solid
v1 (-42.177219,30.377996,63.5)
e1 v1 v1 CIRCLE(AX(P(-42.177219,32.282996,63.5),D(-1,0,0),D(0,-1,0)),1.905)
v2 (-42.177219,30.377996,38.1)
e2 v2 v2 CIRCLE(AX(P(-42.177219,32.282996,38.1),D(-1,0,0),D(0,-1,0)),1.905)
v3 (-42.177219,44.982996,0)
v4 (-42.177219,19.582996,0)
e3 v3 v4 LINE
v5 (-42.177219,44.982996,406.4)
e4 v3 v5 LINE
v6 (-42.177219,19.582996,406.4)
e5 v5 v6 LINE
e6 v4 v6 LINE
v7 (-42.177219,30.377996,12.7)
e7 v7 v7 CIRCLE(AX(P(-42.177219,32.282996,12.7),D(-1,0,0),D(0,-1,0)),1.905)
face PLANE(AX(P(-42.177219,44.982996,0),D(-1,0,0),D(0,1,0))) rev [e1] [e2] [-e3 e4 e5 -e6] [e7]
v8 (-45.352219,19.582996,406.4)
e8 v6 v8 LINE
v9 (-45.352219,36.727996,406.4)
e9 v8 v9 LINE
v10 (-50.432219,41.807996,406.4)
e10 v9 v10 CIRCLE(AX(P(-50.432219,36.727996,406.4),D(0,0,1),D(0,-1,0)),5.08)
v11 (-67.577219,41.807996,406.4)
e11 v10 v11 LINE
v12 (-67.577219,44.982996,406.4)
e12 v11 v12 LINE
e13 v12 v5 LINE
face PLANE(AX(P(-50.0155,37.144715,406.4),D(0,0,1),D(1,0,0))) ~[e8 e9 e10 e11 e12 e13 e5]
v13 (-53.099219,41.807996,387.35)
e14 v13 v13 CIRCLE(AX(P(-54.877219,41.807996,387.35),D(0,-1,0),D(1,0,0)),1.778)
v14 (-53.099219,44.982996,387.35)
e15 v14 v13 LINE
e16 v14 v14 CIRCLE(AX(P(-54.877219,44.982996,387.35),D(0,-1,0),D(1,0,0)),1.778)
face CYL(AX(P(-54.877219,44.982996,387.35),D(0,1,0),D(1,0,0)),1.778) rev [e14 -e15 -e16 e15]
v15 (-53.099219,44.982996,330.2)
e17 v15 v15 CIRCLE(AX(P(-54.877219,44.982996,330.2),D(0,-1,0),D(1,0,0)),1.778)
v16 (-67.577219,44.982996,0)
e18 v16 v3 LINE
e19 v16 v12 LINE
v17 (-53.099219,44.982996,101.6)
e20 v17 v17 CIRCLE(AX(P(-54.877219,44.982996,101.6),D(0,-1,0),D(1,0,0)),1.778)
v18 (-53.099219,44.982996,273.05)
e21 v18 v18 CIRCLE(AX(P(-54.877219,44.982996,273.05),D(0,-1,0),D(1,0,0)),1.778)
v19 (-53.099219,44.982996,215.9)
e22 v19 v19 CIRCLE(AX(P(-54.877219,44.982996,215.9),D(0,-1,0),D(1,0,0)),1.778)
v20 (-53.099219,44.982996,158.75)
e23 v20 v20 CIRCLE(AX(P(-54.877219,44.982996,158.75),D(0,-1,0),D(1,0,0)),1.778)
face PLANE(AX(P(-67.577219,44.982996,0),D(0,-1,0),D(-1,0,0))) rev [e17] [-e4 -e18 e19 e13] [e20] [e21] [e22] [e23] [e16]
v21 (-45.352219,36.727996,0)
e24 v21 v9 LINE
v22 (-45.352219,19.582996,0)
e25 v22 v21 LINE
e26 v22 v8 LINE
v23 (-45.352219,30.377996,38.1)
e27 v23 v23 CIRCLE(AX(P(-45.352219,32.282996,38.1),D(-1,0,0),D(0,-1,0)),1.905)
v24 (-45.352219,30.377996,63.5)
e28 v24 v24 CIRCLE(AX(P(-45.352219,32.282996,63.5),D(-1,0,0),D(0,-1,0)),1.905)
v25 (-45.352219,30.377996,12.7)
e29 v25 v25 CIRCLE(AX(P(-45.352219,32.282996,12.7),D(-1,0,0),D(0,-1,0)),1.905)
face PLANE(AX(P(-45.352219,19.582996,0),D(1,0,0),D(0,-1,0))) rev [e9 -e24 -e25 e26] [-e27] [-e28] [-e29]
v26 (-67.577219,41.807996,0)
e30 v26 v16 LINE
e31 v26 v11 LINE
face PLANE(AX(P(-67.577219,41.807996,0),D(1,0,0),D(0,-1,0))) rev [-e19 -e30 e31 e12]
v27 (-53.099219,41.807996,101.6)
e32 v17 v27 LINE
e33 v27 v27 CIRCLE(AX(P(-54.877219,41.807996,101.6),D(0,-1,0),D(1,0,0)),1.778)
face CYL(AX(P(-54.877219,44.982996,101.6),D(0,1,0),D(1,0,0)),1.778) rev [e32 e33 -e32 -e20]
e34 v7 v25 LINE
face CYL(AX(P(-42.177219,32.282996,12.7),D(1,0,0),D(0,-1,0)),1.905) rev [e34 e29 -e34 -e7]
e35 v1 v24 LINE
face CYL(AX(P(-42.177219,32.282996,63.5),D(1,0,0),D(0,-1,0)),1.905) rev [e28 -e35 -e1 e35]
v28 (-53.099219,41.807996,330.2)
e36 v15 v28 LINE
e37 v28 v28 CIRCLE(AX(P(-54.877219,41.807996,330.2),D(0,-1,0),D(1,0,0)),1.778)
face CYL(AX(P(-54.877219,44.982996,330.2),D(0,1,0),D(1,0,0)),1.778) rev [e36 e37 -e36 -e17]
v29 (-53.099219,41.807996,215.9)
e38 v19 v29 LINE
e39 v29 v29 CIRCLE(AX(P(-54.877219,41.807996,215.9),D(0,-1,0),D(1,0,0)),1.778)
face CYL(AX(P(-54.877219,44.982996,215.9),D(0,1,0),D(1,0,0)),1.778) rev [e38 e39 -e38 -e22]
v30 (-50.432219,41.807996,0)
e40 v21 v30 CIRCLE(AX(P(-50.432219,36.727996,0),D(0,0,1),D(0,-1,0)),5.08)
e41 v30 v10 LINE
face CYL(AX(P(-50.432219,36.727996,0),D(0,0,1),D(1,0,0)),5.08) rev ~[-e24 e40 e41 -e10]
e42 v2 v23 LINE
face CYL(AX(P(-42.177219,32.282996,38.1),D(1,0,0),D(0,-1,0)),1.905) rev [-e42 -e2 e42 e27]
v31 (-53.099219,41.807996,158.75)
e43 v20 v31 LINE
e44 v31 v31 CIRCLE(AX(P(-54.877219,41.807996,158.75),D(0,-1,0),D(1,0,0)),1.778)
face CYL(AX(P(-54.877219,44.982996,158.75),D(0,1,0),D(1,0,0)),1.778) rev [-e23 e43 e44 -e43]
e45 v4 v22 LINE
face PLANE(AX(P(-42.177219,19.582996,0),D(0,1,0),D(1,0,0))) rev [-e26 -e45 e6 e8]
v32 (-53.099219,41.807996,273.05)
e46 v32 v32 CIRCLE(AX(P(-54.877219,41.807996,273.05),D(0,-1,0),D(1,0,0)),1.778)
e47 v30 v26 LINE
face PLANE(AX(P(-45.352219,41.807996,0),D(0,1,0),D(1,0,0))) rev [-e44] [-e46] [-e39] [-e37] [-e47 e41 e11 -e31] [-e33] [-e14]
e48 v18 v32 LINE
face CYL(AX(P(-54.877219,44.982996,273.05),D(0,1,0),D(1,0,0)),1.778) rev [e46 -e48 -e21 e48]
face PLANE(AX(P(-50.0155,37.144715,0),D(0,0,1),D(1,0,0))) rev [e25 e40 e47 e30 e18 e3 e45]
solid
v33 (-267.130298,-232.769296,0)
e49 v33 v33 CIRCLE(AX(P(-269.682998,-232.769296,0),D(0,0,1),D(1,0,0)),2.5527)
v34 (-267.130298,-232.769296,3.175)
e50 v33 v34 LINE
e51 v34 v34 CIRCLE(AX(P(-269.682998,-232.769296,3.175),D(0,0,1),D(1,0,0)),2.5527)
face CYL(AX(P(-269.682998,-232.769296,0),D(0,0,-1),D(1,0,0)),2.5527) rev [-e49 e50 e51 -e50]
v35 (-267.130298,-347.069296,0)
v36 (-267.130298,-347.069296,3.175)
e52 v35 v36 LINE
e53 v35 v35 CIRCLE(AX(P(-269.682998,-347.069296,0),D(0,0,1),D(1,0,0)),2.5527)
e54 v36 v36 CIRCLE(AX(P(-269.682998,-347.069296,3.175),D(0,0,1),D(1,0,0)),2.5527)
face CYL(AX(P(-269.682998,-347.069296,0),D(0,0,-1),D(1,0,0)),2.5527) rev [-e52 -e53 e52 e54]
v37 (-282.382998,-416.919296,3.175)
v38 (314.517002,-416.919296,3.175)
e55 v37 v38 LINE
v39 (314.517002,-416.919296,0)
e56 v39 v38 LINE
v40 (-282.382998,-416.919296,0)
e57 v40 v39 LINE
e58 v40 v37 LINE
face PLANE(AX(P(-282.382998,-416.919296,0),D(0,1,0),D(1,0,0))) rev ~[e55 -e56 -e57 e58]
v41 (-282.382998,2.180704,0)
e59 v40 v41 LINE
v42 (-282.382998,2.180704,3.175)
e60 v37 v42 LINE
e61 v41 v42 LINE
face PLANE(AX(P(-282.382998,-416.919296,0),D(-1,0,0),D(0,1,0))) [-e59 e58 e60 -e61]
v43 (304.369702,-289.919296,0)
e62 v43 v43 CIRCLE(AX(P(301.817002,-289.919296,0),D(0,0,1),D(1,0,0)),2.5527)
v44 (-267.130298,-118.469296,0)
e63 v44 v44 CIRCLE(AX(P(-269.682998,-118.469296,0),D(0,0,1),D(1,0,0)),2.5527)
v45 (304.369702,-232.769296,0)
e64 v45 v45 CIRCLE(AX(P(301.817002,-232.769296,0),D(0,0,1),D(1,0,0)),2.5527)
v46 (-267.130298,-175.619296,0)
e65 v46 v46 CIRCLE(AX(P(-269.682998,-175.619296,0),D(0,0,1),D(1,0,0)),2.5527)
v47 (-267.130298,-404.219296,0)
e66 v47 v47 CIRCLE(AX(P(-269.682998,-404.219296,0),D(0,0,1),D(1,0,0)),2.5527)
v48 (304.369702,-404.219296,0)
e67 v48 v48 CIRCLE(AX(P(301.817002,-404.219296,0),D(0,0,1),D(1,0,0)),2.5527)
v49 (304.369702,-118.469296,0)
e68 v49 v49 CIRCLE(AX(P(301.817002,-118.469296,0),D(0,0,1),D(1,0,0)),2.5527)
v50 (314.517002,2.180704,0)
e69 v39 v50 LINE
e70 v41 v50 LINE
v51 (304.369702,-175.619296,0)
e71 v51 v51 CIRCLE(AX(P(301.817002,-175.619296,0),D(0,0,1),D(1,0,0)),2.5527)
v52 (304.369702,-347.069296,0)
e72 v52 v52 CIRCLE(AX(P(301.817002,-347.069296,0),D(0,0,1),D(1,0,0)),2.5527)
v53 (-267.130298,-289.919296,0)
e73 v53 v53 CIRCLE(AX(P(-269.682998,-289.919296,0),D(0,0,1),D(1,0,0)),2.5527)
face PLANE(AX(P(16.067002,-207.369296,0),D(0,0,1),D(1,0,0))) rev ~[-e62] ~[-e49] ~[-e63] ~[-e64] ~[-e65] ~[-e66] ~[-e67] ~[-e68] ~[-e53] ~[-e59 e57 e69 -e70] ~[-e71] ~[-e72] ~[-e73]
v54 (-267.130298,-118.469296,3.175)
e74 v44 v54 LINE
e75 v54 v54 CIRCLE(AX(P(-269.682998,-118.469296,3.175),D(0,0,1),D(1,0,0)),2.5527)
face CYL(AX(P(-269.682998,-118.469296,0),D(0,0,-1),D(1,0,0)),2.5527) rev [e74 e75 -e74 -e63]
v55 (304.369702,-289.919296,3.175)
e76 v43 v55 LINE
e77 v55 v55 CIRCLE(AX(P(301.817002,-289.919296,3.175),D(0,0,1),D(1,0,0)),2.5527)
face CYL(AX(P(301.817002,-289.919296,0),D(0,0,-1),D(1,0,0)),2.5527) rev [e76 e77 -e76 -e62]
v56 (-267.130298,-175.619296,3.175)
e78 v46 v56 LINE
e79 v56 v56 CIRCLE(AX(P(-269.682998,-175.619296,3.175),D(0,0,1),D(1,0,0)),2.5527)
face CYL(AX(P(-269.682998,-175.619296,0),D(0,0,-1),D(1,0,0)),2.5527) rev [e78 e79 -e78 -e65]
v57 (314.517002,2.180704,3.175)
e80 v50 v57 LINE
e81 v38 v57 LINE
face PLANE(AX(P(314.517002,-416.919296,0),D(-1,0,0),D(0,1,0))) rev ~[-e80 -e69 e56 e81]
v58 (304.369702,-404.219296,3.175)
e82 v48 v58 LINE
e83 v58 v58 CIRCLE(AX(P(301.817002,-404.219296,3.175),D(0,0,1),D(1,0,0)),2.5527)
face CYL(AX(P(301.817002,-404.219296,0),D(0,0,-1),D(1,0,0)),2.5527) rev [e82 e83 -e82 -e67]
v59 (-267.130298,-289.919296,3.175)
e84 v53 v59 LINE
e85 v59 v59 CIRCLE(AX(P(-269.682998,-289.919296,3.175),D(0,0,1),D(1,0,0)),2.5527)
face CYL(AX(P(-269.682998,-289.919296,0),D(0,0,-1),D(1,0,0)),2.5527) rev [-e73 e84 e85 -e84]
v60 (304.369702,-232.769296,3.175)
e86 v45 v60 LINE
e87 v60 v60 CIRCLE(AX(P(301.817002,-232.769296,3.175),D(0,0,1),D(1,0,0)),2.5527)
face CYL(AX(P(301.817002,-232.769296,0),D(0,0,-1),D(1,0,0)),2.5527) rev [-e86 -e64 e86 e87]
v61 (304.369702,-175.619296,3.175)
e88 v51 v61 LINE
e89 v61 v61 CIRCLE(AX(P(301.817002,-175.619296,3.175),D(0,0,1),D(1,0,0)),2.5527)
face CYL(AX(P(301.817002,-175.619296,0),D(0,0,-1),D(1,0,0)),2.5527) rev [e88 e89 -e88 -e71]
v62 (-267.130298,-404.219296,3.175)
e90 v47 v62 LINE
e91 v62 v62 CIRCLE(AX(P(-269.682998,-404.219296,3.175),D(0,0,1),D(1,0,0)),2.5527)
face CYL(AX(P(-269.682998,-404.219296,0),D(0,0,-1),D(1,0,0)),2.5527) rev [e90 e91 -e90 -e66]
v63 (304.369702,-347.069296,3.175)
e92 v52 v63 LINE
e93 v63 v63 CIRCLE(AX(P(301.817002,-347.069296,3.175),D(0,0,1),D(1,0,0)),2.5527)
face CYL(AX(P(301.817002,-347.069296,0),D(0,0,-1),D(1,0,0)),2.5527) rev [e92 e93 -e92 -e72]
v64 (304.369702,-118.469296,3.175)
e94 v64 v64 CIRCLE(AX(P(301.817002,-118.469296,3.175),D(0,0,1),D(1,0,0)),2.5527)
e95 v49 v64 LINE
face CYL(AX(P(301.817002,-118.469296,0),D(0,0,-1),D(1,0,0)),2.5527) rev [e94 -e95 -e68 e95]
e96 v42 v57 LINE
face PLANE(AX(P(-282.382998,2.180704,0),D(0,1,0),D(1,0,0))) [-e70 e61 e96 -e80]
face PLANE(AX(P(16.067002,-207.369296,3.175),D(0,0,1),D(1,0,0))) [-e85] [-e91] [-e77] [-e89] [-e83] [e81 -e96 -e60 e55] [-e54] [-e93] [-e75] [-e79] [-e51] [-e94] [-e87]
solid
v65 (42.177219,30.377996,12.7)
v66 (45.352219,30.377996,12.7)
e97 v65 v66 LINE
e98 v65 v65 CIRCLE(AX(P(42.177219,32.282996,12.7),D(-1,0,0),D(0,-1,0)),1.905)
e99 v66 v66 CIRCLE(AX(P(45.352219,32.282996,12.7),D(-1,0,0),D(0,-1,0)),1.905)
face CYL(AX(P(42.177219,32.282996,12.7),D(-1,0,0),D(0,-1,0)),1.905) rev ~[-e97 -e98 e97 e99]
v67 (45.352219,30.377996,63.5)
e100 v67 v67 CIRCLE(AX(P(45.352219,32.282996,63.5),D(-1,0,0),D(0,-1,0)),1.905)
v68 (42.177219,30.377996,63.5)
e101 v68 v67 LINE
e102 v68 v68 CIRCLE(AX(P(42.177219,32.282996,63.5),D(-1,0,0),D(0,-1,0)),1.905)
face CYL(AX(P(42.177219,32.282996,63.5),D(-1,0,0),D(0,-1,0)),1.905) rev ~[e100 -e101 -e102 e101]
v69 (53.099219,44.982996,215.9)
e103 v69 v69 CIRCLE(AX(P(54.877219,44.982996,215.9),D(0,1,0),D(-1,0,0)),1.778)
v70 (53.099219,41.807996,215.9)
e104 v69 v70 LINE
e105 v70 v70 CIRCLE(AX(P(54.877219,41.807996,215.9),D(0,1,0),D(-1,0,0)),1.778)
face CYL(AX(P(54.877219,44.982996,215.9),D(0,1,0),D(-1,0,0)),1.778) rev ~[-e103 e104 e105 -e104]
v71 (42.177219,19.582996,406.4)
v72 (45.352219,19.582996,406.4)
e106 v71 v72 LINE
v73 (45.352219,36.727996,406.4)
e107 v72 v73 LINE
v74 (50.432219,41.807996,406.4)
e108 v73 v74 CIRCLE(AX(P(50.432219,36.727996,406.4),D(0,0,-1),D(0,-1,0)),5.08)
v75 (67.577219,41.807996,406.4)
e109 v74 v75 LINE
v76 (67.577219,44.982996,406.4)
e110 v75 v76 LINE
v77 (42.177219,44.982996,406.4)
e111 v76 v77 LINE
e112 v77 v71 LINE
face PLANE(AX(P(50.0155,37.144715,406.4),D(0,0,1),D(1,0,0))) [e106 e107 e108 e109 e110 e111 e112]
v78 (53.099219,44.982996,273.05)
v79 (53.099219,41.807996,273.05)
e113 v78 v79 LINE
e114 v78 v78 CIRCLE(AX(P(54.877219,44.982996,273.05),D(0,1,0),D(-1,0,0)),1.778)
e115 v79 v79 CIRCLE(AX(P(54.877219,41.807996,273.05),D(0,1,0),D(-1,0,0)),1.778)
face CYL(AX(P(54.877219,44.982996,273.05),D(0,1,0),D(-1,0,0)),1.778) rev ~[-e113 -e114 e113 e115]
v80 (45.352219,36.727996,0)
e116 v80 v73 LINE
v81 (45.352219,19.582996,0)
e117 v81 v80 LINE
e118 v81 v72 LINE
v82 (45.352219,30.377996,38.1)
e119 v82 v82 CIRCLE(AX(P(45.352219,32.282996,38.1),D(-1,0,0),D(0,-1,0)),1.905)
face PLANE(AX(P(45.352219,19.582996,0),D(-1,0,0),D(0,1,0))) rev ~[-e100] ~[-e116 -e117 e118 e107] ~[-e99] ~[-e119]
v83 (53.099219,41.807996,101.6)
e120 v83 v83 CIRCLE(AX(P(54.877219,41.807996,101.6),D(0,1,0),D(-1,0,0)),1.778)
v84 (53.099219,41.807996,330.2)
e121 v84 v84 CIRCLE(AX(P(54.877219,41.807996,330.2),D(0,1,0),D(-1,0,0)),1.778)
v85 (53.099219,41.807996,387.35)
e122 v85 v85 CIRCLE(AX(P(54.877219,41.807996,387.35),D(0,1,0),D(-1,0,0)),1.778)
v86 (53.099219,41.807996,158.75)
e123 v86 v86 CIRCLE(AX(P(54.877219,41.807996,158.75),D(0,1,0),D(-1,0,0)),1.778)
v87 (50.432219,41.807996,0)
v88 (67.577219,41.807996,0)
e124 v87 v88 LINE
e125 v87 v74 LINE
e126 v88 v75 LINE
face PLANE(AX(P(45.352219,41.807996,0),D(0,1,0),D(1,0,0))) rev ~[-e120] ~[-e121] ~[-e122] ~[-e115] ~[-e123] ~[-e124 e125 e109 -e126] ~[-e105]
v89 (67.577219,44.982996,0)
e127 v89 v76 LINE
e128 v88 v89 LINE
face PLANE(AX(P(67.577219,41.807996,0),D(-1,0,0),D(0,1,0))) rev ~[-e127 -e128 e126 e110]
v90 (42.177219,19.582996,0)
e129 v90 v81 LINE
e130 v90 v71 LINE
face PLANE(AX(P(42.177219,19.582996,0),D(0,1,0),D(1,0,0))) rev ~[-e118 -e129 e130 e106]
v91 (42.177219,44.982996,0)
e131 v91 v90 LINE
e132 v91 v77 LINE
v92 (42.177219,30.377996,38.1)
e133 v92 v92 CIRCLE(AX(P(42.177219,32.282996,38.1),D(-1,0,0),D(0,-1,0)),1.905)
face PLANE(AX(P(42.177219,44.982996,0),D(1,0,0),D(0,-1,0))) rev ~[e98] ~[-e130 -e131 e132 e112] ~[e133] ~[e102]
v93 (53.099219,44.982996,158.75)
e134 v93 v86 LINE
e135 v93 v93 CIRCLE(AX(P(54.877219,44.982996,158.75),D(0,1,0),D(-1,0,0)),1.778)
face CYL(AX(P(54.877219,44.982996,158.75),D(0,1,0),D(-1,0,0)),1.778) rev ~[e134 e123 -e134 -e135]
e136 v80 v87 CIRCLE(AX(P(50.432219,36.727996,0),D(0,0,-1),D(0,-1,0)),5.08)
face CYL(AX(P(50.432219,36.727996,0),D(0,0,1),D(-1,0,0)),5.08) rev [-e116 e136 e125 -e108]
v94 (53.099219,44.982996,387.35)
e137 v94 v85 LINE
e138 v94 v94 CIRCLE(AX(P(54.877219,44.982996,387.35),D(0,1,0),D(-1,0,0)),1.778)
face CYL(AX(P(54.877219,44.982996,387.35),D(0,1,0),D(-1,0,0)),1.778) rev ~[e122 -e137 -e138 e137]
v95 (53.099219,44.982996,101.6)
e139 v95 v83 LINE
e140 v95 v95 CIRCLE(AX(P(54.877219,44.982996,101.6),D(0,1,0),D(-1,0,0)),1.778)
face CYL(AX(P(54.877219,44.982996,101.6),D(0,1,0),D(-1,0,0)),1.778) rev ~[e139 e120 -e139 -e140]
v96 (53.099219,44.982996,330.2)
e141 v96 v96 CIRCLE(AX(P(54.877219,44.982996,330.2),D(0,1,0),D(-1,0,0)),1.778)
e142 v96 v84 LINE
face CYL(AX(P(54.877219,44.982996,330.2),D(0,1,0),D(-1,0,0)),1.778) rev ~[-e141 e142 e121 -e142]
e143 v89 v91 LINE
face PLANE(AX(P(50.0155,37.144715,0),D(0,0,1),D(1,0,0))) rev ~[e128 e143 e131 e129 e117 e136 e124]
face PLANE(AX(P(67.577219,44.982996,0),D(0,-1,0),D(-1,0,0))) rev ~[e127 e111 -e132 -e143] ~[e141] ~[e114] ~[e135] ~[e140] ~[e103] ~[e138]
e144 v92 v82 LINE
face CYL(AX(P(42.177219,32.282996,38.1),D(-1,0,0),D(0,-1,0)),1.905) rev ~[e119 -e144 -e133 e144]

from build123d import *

# Parameters (mm, degrees)
F1_DEPTH = 406.4
F2_R     = 5.08
F3_R     = 1.905
F4_DEPTH = 25.401
F5_R     = 1.778
F6_DEPTH = 25.401
F8_W     = 596.9
F8_H     = 419.1
F8_R     = 2.5527
F9_DEPTH = 3.175


# Not quite as in the source:
# - a length typed as a fraction of an inch, garbled in the dataset ("3 / 203.2 mm" for 3/8 in), is restored


with BuildPart() as f1:
    # F0 (on Top) → F1 (new body)
    with BuildSketch(Plane.XY):
        Polygon((42.1772189438, 44.9829958379), (42.1772189438, 19.5829958379), (45.3522189438, 19.5829958379), (45.3522189438, 41.8079958379), (67.5772189438, 41.8079958379), (67.5772189438, 44.9829958379), align=None)
    extrude(amount=F1_DEPTH)

    # F2
    f2_edges = [f1.edges().sort_by_distance(p)[0] for p in [
        (45.352219, 41.807996, 203.2),
    ]]
    fillet(f2_edges, radius=F2_R)

    # F3 (on face) → F4 (cut, through all)
    with BuildSketch(Plane(origin=(42.1772189438, 0, 0), x_dir=(0, -1, 0), z_dir=(-1, 0, 0))):
        with Locations((-32.2829958379, 12.7)):
            Circle(F3_R)
        with Locations((-32.2829958379, 38.1)):
            Circle(F3_R)
        with Locations((-32.2829958379, 63.5)):
            Circle(F3_R)
    extrude(amount=-F4_DEPTH, mode=Mode.SUBTRACT)

    # F5 (on face) → F6 (cut, through all)
    with BuildSketch(Plane(origin=(0, 44.9829958379, 0), x_dir=(-1, 0, 0), z_dir=(0, 1, 0))):
        with Locations((-54.8772189438, 101.6)):
            Circle(F5_R)
        with Locations((-54.8772189438, 158.75)):
            Circle(F5_R)
        with Locations((-54.8772189438, 215.9)):
            Circle(F5_R)
        with Locations((-54.8772189438, 273.05)):
            Circle(F5_R)
        with Locations((-54.8772189438, 330.2)):
            Circle(F5_R)
        with Locations((-54.8772189438, 387.35)):
            Circle(F5_R)
    extrude(amount=-F6_DEPTH, mode=Mode.SUBTRACT)


with BuildPart() as f7_1:
    # F7: instance of F1
    add(f1.part.mirror(Plane.YZ))


with BuildPart() as f9:
    # F8 (on Top) → F9 (new body)
    with BuildSketch(Plane.XY):
        with Locations((16.0670019686, -207.3692955732)):
            Rectangle(F8_W, F8_H)
        with Locations((-269.6829980314, -404.2192955732)):
            Circle(F8_R, mode=Mode.SUBTRACT)
        with Locations((-269.6829980314, -347.0692955732)):
            Circle(F8_R, mode=Mode.SUBTRACT)
        with Locations((-269.6829980314, -289.9192955732)):
            Circle(F8_R, mode=Mode.SUBTRACT)
        with Locations((-269.6829980314, -232.7692955732)):
            Circle(F8_R, mode=Mode.SUBTRACT)
        with Locations((301.8170019686, -404.2192955732)):
            Circle(F8_R, mode=Mode.SUBTRACT)
        with Locations((301.8170019686, -347.0692955732)):
            Circle(F8_R, mode=Mode.SUBTRACT)
        with Locations((301.8170019686, -289.9192955732)):
            Circle(F8_R, mode=Mode.SUBTRACT)
        with Locations((301.8170019686, -232.7692955732)):
            Circle(F8_R, mode=Mode.SUBTRACT)
        with Locations((-269.6829980314, -175.6192955732)):
            Circle(F8_R, mode=Mode.SUBTRACT)
        with Locations((-269.6829980314, -118.4692955732)):
            Circle(F8_R, mode=Mode.SUBTRACT)
        with Locations((301.8170019686, -175.6192955732)):
            Circle(F8_R, mode=Mode.SUBTRACT)
        with Locations((301.8170019686, -118.4692955732)):
            Circle(F8_R, mode=Mode.SUBTRACT)
    extrude(amount=F9_DEPTH)


solid = Compound([f1.part, f7_1.part, f9.part])
